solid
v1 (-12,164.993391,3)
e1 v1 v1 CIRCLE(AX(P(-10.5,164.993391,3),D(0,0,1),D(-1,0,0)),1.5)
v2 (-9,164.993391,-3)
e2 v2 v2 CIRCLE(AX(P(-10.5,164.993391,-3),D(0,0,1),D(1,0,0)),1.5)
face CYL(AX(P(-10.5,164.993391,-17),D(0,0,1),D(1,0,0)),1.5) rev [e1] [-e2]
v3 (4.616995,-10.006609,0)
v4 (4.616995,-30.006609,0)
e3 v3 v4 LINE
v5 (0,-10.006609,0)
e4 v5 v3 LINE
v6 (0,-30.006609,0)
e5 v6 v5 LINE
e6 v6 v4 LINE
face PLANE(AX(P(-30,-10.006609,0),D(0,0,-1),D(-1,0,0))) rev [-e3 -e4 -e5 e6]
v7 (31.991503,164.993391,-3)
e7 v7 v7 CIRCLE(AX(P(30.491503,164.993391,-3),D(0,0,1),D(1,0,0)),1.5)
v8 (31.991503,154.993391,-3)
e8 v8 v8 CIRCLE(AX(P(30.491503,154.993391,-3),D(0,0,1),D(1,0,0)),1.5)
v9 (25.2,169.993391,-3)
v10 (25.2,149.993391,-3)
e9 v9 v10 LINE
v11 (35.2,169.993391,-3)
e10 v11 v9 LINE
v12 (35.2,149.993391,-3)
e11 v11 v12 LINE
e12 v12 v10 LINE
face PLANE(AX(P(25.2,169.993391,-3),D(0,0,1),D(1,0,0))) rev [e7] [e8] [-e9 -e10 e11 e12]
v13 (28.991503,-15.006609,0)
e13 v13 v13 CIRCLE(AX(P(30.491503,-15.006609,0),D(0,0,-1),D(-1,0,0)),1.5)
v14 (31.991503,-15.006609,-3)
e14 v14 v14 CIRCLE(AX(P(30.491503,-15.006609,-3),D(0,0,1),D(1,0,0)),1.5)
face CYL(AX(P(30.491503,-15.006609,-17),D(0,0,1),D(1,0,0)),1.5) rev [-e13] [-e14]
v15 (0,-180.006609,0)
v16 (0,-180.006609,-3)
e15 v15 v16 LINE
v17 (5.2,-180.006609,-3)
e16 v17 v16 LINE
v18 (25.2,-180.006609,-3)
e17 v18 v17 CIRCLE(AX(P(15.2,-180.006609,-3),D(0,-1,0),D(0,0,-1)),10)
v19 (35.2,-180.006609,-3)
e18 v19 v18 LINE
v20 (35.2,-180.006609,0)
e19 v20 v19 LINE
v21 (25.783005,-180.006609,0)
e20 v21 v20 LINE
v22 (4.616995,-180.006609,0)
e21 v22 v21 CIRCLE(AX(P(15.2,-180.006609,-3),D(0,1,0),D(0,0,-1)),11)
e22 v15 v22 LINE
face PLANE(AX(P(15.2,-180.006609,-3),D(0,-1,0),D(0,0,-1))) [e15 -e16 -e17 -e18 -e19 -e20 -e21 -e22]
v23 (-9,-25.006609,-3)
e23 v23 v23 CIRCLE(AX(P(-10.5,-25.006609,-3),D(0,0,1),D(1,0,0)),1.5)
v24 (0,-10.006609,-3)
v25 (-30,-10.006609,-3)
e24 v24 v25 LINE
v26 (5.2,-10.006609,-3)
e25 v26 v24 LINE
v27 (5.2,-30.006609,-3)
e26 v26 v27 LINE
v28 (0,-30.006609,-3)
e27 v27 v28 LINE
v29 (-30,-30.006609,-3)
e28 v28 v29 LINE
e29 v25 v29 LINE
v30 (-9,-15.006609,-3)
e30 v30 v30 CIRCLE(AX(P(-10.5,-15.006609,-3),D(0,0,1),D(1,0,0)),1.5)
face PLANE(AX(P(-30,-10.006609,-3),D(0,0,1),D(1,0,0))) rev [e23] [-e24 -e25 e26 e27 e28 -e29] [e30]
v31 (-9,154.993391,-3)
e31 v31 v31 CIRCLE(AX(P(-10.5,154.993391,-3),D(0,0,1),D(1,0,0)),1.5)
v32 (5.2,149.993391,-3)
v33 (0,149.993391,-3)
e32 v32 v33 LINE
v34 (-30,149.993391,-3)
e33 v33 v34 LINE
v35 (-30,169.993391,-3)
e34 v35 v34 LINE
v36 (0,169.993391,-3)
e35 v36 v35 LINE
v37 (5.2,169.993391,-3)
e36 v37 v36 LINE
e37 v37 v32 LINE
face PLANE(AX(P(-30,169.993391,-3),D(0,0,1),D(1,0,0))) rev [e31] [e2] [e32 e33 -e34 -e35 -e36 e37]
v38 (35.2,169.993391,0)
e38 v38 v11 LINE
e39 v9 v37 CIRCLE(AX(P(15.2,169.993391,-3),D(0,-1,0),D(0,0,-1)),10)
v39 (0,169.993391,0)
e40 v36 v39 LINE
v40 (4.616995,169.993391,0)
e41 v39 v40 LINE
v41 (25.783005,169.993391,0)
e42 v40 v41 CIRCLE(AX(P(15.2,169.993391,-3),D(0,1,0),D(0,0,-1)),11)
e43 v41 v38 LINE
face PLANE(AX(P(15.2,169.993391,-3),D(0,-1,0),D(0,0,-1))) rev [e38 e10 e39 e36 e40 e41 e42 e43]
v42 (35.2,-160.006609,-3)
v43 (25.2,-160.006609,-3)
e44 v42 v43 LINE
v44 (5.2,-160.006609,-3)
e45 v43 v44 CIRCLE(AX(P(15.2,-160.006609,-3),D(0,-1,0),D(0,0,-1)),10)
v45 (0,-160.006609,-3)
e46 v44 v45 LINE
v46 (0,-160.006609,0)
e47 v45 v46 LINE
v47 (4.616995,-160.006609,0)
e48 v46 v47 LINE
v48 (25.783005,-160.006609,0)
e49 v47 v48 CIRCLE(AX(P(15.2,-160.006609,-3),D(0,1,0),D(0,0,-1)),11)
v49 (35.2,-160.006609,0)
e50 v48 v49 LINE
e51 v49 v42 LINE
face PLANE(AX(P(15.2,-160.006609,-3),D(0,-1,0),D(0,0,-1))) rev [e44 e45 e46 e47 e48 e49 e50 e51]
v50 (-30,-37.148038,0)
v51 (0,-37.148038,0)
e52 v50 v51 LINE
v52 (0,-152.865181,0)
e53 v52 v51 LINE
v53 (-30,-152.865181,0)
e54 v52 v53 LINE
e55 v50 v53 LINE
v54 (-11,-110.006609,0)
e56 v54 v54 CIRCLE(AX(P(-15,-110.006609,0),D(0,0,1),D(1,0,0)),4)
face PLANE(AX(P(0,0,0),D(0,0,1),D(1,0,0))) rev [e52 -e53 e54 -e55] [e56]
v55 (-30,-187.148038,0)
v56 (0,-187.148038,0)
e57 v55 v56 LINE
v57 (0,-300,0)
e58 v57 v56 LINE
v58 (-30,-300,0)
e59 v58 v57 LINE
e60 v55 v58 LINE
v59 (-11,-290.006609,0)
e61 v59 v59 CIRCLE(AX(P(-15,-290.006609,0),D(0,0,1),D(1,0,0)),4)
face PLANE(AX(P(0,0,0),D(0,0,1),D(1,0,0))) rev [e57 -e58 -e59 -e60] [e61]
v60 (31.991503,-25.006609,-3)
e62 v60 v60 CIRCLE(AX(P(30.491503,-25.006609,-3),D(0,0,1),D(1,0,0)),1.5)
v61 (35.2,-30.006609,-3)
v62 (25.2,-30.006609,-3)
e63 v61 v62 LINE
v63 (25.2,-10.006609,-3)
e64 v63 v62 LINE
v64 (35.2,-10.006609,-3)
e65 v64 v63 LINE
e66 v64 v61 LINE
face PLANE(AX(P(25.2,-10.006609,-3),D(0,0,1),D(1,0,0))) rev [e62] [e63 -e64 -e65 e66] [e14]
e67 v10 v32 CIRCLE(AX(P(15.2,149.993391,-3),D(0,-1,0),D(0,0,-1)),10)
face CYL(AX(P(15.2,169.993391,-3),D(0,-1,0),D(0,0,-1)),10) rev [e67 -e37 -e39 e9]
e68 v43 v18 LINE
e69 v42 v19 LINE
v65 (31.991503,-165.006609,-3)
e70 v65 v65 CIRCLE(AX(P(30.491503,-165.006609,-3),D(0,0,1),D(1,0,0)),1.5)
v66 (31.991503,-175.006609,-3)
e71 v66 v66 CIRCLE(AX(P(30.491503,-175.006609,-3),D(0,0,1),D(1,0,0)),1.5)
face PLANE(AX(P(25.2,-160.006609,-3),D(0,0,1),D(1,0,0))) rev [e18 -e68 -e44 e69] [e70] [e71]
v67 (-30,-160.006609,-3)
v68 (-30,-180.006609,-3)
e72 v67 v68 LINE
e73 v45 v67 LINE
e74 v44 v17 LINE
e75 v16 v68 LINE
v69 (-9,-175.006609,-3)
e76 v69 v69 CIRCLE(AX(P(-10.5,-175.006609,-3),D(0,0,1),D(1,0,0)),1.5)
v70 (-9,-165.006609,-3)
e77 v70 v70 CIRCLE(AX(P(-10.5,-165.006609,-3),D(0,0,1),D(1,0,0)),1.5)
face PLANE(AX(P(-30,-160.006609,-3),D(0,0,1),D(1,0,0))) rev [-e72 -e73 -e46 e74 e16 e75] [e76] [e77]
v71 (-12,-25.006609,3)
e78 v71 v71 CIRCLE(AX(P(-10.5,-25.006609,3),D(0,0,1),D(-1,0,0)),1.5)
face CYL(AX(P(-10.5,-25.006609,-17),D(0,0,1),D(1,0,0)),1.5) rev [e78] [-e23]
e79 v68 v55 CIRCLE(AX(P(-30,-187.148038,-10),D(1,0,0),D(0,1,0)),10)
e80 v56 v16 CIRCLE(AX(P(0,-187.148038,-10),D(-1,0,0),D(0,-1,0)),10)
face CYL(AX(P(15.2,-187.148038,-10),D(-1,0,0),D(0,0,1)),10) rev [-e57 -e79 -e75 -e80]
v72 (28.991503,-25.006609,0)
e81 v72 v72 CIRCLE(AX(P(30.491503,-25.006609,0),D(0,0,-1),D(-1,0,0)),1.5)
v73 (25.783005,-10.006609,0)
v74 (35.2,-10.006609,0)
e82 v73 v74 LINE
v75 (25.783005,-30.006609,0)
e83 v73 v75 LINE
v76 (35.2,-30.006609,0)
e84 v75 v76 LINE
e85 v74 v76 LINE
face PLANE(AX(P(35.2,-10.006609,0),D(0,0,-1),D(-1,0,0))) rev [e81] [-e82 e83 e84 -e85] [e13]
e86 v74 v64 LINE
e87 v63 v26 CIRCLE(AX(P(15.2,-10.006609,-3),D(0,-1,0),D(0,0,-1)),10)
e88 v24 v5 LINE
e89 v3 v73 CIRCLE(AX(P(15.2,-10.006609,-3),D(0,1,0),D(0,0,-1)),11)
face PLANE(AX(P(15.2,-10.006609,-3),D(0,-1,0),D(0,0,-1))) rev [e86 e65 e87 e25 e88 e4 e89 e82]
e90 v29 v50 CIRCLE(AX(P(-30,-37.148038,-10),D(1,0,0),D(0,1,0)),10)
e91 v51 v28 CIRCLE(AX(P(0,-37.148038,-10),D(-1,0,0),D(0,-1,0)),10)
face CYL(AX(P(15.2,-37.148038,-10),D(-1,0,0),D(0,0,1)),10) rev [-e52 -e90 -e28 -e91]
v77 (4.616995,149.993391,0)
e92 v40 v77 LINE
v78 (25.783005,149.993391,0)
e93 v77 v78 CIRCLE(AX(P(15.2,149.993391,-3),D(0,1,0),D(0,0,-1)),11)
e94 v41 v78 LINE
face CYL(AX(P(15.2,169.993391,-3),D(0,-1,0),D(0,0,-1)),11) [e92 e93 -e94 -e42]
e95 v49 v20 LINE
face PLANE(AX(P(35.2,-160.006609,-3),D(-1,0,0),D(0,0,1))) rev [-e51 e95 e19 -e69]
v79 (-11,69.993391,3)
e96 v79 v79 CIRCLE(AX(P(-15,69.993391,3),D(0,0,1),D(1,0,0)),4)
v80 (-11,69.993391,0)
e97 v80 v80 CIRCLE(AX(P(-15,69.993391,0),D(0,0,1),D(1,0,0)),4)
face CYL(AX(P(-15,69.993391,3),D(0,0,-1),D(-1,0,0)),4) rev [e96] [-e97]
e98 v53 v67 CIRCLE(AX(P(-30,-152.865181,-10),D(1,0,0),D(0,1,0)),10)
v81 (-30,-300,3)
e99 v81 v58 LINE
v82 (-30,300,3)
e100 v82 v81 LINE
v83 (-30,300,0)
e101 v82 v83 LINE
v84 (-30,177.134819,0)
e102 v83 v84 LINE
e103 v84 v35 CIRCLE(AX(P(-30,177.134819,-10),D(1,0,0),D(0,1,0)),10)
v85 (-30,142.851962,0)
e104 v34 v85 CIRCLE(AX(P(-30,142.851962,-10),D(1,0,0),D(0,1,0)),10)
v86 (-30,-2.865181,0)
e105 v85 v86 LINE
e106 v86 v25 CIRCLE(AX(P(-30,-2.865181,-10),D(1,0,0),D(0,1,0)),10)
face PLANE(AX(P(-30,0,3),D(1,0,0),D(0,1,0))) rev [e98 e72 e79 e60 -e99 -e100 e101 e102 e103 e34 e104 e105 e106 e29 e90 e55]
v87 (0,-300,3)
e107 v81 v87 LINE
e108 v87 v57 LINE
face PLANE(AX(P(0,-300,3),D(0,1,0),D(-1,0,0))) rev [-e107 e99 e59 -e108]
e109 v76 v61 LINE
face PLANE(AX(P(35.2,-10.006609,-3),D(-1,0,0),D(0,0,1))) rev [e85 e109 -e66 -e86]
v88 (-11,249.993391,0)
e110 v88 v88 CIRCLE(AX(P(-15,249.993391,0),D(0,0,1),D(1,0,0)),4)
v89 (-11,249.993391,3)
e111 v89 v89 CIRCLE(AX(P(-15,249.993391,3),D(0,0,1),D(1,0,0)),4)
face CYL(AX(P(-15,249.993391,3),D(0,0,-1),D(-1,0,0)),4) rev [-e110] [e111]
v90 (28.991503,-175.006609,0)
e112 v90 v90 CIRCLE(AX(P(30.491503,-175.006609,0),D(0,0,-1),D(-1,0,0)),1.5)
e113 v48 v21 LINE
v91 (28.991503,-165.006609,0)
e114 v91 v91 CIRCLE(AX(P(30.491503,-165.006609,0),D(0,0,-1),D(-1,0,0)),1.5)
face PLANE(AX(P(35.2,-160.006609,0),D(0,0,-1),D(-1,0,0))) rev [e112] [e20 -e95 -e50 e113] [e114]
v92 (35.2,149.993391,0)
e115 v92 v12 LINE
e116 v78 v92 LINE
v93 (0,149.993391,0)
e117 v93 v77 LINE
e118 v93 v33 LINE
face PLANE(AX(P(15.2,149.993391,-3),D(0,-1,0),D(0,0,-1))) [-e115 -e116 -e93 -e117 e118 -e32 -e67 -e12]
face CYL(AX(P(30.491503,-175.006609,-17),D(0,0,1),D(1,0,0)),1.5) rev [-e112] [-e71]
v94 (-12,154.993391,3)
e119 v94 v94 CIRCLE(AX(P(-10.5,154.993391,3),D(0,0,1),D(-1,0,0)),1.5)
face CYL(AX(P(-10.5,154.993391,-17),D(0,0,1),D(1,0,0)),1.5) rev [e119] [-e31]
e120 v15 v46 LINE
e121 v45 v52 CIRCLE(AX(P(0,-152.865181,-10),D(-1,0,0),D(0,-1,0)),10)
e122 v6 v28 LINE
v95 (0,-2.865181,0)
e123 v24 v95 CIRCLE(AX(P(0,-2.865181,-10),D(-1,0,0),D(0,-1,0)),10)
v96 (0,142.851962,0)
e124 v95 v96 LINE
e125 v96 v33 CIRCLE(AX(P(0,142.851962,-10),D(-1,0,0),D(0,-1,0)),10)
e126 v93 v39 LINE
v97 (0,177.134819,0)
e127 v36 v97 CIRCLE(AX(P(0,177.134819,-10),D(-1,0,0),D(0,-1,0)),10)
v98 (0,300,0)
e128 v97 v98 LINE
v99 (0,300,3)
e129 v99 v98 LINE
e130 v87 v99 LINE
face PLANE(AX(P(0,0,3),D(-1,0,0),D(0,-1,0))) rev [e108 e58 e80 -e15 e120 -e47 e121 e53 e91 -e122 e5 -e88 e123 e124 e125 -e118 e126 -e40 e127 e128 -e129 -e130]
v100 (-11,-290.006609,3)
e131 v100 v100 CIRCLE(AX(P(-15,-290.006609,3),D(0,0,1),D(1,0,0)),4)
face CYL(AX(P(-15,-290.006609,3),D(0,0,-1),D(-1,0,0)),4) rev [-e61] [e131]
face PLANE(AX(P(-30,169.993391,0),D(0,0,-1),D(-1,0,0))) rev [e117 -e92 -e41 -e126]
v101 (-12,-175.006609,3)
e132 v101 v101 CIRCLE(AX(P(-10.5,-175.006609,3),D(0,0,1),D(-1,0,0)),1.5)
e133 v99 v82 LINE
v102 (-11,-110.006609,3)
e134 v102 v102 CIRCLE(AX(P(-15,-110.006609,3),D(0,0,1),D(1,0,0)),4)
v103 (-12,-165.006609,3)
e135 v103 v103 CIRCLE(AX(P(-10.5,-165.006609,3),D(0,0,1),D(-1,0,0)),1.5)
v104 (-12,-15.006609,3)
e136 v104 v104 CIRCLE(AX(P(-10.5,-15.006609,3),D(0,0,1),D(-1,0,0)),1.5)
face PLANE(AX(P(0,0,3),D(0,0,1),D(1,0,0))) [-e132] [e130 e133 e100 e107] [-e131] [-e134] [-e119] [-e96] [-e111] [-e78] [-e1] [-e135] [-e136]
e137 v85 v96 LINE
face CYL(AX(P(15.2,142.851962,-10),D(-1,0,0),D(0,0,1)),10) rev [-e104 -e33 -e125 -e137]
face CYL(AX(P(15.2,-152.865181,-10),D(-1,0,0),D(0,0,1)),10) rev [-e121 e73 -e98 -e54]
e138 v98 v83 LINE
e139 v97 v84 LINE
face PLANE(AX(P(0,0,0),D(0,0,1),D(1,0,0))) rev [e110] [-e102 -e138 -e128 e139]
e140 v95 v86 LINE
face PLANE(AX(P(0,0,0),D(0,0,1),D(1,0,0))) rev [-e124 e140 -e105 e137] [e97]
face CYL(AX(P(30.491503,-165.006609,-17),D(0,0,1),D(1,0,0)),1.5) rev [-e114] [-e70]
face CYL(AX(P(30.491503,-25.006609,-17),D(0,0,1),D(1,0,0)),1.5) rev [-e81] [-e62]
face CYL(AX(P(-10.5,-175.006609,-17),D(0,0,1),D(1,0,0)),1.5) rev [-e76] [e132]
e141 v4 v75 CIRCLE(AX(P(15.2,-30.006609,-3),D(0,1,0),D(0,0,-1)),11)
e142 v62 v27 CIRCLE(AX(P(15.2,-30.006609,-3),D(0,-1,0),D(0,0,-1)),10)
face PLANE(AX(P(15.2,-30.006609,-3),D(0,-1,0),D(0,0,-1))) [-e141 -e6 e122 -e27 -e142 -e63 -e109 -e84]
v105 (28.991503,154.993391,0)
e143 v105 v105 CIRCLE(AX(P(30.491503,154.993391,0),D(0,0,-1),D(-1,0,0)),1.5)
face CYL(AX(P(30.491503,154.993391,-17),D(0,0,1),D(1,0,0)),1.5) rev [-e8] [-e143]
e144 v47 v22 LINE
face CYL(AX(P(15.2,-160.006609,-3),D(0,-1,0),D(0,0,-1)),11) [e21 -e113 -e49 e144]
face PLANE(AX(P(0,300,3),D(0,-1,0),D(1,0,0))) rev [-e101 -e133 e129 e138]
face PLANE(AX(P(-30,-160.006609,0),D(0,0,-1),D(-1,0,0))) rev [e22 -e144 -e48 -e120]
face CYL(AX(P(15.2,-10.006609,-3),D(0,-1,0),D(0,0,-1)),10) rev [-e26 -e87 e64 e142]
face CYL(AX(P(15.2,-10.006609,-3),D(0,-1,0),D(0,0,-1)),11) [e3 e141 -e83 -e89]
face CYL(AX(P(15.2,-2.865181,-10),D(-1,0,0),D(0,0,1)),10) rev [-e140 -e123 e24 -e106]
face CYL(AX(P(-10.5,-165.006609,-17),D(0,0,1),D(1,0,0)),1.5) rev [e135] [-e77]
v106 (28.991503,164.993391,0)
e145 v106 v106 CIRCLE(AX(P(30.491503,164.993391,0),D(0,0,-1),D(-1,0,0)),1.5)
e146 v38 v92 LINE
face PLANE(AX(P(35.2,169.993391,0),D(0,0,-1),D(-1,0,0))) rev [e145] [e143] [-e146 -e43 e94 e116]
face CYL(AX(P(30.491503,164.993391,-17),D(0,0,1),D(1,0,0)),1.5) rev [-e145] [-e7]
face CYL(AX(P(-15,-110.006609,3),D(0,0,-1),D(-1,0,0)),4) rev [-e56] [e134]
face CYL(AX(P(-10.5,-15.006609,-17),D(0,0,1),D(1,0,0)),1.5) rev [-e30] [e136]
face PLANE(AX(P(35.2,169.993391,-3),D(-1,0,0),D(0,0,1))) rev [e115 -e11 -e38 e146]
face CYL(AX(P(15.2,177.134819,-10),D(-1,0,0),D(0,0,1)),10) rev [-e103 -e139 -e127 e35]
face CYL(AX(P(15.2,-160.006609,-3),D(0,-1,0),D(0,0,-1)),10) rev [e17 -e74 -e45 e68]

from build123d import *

# Parameters (mm, degrees)
SKETCH_1_W          = 30
SKETCH_1_H          = 300
SKETCH_1_R          = 4
EXTRUDE_1_DEPTH     = 3
EXTRUDE_2_DEPTH     = 10
EXTRUDE_3_DEPTH     = 10
EXTRUDE_4_DEPTH     = 10
SKETCH_13_R         = 1.5
CUT_EXTRUDE_1_DEPTH = 20
FILLET_1_R          = 10


with BuildPart() as part:
    # 草图1 → 凸台-拉伸1 (new body)
    # profile 1 of 2: a face of its own
    with BuildSketch(Plane.XY):
        with Locations((-15, 150)):
            Rectangle(SKETCH_1_W, SKETCH_1_H)
        with Locations((-15, 69.99339056)):
            Circle(SKETCH_1_R, mode=Mode.SUBTRACT)
        with Locations((-15, 249.99339056)):
            Circle(SKETCH_1_R, mode=Mode.SUBTRACT)
    # profile 2 of 2: a face of its own
    with BuildSketch(Plane.XY):
        with Locations((-15, -150)):
            Rectangle(SKETCH_1_W, SKETCH_1_H)
        with Locations((-15, -290.00660944)):
            Circle(SKETCH_1_R, mode=Mode.SUBTRACT)
        with Locations((-15, -110.00660944)):
            Circle(SKETCH_1_R, mode=Mode.SUBTRACT)
    extrude(amount=EXTRUDE_1_DEPTH)

    # 草图10 → 凸台-拉伸2 (add, symmetric)
    with BuildSketch(Plane(origin=(0, -20.00660944, 0), x_dir=(1, 0, 0), z_dir=(0, 1, 0))):
        with BuildLine():
            Line((-30, 0), (4.616994756, 0))
            ThreePointArc((4.616994756, 0), (15.2, -8), (25.783005244, 0))
            Line((25.783005244, 0), (35.2, 0))
            Line((35.2, 0), (35.2, 3))
            Line((35.2, 3), (25.2, 3))
            ThreePointArc((25.2, 3), (15.2, -7), (5.2, 3))
            Line((5.2, 3), (-30, 3))
            Line((-30, 3), (-30, 0))
        make_face()
    extrude(amount=EXTRUDE_2_DEPTH, both=True)

    # 草图11 → 凸台-拉伸3 (add, symmetric)
    with BuildSketch(Plane(origin=(0, 159.99339056, 0), x_dir=(1, 0, 0), z_dir=(0, 1, 0))):
        with BuildLine():
            Line((-30, 0), (4.616994756, 0))
            ThreePointArc((4.616994756, 0), (15.2, -8), (25.783005244, 0))
            Line((25.783005244, 0), (35.2, 0))
            Line((35.2, 0), (35.2, 3))
            Line((35.2, 3), (25.2, 3))
            ThreePointArc((25.2, 3), (15.2, -7), (5.2, 3))
            Line((5.2, 3), (-30, 3))
            Line((-30, 3), (-30, 0))
        make_face()
    extrude(amount=EXTRUDE_3_DEPTH, both=True)

    # 草图12 → 凸台-拉伸4 (add, symmetric)
    with BuildSketch(Plane(origin=(0, -170.00660944, 0), x_dir=(1, 0, 0), z_dir=(0, 1, 0))):
        with BuildLine():
            Line((-30, 0), (4.616994756, 0))
            ThreePointArc((4.616994756, 0), (15.2, -8), (25.783005244, 0))
            Line((25.783005244, 0), (35.2, 0))
            Line((35.2, 0), (35.2, 3))
            Line((35.2, 3), (25.2, 3))
            ThreePointArc((25.2, 3), (15.2, -7), (5.2, 3))
            Line((5.2, 3), (-30, 3))
            Line((-30, 3), (-30, 0))
        make_face()
    extrude(amount=EXTRUDE_4_DEPTH, both=True)

    # 草图13 → 切除-拉伸1 (cut)
    with BuildSketch(Plane.XY.offset(3)):
        with Locations((30.491502622, 164.99339056)):
            Circle(SKETCH_13_R)
        with Locations((30.491502622, 154.99339056)):
            Circle(SKETCH_13_R)
        with Locations((-10.5, 154.99339056)):
            Circle(SKETCH_13_R)
        with Locations((-10.5, 164.99339056)):
            Circle(SKETCH_13_R)
        with Locations((30.491502622, -15.00660944)):
            Circle(SKETCH_13_R)
        with Locations((30.491502622, -25.00660944)):
            Circle(SKETCH_13_R)
        with Locations((-10.5, -25.00660944)):
            Circle(SKETCH_13_R)
        with Locations((-10.5, -15.00660944)):
            Circle(SKETCH_13_R)
        with Locations((30.491502622, -165.00660944)):
            Circle(SKETCH_13_R)
        with Locations((30.491502622, -175.00660944)):
            Circle(SKETCH_13_R)
        with Locations((-10.5, -175.00660944)):
            Circle(SKETCH_13_R)
        with Locations((-10.5, -165.00660944)):
            Circle(SKETCH_13_R)
    extrude(amount=-CUT_EXTRUDE_1_DEPTH, mode=Mode.SUBTRACT)

    # 圆角1
    # the kernel refuses this fillet: 10 mm, written as the material it adds along each edge
    with BuildSketch(Plane(origin=(-30, -160.00660944, 0), x_dir=(0, 1, 0), z_dir=(1, 0, 0)), Plane(origin=(-30, -10.00660944, 0), x_dir=(0, 1, 0), z_dir=(1, 0, 0)), Plane(origin=(-30, 169.99339056, 0), x_dir=(0, 1, 0), z_dir=(1, 0, 0))) as fillet_1_piece_1:
        with BuildLine():
            CenterArc((7.141428429, -10), FILLET_1_R, 90, 45.572995999)
            Line((0, -3), (0, 0))
            Line((0, 0), (7.141428429, 0))
        make_face()
    extrude(amount=30)
    with BuildSketch(Plane(origin=(-30, -180.00660944, 0), x_dir=(0, -1, 0), z_dir=(1, 0, 0)), Plane(origin=(-30, -30.00660944, 0), x_dir=(0, -1, 0), z_dir=(1, 0, 0)), Plane(origin=(-30, 149.99339056, 0), x_dir=(0, -1, 0), z_dir=(1, 0, 0))) as fillet_1_piece_2:
        with BuildLine():
            CenterArc((7.141428429, 10), FILLET_1_R, 224.427004001, 45.572995999)
            Line((0, 3), (0, 0))
            Line((0, 0), (7.141428429, 0))
        make_face()
    extrude(amount=30)


solid = part.part
